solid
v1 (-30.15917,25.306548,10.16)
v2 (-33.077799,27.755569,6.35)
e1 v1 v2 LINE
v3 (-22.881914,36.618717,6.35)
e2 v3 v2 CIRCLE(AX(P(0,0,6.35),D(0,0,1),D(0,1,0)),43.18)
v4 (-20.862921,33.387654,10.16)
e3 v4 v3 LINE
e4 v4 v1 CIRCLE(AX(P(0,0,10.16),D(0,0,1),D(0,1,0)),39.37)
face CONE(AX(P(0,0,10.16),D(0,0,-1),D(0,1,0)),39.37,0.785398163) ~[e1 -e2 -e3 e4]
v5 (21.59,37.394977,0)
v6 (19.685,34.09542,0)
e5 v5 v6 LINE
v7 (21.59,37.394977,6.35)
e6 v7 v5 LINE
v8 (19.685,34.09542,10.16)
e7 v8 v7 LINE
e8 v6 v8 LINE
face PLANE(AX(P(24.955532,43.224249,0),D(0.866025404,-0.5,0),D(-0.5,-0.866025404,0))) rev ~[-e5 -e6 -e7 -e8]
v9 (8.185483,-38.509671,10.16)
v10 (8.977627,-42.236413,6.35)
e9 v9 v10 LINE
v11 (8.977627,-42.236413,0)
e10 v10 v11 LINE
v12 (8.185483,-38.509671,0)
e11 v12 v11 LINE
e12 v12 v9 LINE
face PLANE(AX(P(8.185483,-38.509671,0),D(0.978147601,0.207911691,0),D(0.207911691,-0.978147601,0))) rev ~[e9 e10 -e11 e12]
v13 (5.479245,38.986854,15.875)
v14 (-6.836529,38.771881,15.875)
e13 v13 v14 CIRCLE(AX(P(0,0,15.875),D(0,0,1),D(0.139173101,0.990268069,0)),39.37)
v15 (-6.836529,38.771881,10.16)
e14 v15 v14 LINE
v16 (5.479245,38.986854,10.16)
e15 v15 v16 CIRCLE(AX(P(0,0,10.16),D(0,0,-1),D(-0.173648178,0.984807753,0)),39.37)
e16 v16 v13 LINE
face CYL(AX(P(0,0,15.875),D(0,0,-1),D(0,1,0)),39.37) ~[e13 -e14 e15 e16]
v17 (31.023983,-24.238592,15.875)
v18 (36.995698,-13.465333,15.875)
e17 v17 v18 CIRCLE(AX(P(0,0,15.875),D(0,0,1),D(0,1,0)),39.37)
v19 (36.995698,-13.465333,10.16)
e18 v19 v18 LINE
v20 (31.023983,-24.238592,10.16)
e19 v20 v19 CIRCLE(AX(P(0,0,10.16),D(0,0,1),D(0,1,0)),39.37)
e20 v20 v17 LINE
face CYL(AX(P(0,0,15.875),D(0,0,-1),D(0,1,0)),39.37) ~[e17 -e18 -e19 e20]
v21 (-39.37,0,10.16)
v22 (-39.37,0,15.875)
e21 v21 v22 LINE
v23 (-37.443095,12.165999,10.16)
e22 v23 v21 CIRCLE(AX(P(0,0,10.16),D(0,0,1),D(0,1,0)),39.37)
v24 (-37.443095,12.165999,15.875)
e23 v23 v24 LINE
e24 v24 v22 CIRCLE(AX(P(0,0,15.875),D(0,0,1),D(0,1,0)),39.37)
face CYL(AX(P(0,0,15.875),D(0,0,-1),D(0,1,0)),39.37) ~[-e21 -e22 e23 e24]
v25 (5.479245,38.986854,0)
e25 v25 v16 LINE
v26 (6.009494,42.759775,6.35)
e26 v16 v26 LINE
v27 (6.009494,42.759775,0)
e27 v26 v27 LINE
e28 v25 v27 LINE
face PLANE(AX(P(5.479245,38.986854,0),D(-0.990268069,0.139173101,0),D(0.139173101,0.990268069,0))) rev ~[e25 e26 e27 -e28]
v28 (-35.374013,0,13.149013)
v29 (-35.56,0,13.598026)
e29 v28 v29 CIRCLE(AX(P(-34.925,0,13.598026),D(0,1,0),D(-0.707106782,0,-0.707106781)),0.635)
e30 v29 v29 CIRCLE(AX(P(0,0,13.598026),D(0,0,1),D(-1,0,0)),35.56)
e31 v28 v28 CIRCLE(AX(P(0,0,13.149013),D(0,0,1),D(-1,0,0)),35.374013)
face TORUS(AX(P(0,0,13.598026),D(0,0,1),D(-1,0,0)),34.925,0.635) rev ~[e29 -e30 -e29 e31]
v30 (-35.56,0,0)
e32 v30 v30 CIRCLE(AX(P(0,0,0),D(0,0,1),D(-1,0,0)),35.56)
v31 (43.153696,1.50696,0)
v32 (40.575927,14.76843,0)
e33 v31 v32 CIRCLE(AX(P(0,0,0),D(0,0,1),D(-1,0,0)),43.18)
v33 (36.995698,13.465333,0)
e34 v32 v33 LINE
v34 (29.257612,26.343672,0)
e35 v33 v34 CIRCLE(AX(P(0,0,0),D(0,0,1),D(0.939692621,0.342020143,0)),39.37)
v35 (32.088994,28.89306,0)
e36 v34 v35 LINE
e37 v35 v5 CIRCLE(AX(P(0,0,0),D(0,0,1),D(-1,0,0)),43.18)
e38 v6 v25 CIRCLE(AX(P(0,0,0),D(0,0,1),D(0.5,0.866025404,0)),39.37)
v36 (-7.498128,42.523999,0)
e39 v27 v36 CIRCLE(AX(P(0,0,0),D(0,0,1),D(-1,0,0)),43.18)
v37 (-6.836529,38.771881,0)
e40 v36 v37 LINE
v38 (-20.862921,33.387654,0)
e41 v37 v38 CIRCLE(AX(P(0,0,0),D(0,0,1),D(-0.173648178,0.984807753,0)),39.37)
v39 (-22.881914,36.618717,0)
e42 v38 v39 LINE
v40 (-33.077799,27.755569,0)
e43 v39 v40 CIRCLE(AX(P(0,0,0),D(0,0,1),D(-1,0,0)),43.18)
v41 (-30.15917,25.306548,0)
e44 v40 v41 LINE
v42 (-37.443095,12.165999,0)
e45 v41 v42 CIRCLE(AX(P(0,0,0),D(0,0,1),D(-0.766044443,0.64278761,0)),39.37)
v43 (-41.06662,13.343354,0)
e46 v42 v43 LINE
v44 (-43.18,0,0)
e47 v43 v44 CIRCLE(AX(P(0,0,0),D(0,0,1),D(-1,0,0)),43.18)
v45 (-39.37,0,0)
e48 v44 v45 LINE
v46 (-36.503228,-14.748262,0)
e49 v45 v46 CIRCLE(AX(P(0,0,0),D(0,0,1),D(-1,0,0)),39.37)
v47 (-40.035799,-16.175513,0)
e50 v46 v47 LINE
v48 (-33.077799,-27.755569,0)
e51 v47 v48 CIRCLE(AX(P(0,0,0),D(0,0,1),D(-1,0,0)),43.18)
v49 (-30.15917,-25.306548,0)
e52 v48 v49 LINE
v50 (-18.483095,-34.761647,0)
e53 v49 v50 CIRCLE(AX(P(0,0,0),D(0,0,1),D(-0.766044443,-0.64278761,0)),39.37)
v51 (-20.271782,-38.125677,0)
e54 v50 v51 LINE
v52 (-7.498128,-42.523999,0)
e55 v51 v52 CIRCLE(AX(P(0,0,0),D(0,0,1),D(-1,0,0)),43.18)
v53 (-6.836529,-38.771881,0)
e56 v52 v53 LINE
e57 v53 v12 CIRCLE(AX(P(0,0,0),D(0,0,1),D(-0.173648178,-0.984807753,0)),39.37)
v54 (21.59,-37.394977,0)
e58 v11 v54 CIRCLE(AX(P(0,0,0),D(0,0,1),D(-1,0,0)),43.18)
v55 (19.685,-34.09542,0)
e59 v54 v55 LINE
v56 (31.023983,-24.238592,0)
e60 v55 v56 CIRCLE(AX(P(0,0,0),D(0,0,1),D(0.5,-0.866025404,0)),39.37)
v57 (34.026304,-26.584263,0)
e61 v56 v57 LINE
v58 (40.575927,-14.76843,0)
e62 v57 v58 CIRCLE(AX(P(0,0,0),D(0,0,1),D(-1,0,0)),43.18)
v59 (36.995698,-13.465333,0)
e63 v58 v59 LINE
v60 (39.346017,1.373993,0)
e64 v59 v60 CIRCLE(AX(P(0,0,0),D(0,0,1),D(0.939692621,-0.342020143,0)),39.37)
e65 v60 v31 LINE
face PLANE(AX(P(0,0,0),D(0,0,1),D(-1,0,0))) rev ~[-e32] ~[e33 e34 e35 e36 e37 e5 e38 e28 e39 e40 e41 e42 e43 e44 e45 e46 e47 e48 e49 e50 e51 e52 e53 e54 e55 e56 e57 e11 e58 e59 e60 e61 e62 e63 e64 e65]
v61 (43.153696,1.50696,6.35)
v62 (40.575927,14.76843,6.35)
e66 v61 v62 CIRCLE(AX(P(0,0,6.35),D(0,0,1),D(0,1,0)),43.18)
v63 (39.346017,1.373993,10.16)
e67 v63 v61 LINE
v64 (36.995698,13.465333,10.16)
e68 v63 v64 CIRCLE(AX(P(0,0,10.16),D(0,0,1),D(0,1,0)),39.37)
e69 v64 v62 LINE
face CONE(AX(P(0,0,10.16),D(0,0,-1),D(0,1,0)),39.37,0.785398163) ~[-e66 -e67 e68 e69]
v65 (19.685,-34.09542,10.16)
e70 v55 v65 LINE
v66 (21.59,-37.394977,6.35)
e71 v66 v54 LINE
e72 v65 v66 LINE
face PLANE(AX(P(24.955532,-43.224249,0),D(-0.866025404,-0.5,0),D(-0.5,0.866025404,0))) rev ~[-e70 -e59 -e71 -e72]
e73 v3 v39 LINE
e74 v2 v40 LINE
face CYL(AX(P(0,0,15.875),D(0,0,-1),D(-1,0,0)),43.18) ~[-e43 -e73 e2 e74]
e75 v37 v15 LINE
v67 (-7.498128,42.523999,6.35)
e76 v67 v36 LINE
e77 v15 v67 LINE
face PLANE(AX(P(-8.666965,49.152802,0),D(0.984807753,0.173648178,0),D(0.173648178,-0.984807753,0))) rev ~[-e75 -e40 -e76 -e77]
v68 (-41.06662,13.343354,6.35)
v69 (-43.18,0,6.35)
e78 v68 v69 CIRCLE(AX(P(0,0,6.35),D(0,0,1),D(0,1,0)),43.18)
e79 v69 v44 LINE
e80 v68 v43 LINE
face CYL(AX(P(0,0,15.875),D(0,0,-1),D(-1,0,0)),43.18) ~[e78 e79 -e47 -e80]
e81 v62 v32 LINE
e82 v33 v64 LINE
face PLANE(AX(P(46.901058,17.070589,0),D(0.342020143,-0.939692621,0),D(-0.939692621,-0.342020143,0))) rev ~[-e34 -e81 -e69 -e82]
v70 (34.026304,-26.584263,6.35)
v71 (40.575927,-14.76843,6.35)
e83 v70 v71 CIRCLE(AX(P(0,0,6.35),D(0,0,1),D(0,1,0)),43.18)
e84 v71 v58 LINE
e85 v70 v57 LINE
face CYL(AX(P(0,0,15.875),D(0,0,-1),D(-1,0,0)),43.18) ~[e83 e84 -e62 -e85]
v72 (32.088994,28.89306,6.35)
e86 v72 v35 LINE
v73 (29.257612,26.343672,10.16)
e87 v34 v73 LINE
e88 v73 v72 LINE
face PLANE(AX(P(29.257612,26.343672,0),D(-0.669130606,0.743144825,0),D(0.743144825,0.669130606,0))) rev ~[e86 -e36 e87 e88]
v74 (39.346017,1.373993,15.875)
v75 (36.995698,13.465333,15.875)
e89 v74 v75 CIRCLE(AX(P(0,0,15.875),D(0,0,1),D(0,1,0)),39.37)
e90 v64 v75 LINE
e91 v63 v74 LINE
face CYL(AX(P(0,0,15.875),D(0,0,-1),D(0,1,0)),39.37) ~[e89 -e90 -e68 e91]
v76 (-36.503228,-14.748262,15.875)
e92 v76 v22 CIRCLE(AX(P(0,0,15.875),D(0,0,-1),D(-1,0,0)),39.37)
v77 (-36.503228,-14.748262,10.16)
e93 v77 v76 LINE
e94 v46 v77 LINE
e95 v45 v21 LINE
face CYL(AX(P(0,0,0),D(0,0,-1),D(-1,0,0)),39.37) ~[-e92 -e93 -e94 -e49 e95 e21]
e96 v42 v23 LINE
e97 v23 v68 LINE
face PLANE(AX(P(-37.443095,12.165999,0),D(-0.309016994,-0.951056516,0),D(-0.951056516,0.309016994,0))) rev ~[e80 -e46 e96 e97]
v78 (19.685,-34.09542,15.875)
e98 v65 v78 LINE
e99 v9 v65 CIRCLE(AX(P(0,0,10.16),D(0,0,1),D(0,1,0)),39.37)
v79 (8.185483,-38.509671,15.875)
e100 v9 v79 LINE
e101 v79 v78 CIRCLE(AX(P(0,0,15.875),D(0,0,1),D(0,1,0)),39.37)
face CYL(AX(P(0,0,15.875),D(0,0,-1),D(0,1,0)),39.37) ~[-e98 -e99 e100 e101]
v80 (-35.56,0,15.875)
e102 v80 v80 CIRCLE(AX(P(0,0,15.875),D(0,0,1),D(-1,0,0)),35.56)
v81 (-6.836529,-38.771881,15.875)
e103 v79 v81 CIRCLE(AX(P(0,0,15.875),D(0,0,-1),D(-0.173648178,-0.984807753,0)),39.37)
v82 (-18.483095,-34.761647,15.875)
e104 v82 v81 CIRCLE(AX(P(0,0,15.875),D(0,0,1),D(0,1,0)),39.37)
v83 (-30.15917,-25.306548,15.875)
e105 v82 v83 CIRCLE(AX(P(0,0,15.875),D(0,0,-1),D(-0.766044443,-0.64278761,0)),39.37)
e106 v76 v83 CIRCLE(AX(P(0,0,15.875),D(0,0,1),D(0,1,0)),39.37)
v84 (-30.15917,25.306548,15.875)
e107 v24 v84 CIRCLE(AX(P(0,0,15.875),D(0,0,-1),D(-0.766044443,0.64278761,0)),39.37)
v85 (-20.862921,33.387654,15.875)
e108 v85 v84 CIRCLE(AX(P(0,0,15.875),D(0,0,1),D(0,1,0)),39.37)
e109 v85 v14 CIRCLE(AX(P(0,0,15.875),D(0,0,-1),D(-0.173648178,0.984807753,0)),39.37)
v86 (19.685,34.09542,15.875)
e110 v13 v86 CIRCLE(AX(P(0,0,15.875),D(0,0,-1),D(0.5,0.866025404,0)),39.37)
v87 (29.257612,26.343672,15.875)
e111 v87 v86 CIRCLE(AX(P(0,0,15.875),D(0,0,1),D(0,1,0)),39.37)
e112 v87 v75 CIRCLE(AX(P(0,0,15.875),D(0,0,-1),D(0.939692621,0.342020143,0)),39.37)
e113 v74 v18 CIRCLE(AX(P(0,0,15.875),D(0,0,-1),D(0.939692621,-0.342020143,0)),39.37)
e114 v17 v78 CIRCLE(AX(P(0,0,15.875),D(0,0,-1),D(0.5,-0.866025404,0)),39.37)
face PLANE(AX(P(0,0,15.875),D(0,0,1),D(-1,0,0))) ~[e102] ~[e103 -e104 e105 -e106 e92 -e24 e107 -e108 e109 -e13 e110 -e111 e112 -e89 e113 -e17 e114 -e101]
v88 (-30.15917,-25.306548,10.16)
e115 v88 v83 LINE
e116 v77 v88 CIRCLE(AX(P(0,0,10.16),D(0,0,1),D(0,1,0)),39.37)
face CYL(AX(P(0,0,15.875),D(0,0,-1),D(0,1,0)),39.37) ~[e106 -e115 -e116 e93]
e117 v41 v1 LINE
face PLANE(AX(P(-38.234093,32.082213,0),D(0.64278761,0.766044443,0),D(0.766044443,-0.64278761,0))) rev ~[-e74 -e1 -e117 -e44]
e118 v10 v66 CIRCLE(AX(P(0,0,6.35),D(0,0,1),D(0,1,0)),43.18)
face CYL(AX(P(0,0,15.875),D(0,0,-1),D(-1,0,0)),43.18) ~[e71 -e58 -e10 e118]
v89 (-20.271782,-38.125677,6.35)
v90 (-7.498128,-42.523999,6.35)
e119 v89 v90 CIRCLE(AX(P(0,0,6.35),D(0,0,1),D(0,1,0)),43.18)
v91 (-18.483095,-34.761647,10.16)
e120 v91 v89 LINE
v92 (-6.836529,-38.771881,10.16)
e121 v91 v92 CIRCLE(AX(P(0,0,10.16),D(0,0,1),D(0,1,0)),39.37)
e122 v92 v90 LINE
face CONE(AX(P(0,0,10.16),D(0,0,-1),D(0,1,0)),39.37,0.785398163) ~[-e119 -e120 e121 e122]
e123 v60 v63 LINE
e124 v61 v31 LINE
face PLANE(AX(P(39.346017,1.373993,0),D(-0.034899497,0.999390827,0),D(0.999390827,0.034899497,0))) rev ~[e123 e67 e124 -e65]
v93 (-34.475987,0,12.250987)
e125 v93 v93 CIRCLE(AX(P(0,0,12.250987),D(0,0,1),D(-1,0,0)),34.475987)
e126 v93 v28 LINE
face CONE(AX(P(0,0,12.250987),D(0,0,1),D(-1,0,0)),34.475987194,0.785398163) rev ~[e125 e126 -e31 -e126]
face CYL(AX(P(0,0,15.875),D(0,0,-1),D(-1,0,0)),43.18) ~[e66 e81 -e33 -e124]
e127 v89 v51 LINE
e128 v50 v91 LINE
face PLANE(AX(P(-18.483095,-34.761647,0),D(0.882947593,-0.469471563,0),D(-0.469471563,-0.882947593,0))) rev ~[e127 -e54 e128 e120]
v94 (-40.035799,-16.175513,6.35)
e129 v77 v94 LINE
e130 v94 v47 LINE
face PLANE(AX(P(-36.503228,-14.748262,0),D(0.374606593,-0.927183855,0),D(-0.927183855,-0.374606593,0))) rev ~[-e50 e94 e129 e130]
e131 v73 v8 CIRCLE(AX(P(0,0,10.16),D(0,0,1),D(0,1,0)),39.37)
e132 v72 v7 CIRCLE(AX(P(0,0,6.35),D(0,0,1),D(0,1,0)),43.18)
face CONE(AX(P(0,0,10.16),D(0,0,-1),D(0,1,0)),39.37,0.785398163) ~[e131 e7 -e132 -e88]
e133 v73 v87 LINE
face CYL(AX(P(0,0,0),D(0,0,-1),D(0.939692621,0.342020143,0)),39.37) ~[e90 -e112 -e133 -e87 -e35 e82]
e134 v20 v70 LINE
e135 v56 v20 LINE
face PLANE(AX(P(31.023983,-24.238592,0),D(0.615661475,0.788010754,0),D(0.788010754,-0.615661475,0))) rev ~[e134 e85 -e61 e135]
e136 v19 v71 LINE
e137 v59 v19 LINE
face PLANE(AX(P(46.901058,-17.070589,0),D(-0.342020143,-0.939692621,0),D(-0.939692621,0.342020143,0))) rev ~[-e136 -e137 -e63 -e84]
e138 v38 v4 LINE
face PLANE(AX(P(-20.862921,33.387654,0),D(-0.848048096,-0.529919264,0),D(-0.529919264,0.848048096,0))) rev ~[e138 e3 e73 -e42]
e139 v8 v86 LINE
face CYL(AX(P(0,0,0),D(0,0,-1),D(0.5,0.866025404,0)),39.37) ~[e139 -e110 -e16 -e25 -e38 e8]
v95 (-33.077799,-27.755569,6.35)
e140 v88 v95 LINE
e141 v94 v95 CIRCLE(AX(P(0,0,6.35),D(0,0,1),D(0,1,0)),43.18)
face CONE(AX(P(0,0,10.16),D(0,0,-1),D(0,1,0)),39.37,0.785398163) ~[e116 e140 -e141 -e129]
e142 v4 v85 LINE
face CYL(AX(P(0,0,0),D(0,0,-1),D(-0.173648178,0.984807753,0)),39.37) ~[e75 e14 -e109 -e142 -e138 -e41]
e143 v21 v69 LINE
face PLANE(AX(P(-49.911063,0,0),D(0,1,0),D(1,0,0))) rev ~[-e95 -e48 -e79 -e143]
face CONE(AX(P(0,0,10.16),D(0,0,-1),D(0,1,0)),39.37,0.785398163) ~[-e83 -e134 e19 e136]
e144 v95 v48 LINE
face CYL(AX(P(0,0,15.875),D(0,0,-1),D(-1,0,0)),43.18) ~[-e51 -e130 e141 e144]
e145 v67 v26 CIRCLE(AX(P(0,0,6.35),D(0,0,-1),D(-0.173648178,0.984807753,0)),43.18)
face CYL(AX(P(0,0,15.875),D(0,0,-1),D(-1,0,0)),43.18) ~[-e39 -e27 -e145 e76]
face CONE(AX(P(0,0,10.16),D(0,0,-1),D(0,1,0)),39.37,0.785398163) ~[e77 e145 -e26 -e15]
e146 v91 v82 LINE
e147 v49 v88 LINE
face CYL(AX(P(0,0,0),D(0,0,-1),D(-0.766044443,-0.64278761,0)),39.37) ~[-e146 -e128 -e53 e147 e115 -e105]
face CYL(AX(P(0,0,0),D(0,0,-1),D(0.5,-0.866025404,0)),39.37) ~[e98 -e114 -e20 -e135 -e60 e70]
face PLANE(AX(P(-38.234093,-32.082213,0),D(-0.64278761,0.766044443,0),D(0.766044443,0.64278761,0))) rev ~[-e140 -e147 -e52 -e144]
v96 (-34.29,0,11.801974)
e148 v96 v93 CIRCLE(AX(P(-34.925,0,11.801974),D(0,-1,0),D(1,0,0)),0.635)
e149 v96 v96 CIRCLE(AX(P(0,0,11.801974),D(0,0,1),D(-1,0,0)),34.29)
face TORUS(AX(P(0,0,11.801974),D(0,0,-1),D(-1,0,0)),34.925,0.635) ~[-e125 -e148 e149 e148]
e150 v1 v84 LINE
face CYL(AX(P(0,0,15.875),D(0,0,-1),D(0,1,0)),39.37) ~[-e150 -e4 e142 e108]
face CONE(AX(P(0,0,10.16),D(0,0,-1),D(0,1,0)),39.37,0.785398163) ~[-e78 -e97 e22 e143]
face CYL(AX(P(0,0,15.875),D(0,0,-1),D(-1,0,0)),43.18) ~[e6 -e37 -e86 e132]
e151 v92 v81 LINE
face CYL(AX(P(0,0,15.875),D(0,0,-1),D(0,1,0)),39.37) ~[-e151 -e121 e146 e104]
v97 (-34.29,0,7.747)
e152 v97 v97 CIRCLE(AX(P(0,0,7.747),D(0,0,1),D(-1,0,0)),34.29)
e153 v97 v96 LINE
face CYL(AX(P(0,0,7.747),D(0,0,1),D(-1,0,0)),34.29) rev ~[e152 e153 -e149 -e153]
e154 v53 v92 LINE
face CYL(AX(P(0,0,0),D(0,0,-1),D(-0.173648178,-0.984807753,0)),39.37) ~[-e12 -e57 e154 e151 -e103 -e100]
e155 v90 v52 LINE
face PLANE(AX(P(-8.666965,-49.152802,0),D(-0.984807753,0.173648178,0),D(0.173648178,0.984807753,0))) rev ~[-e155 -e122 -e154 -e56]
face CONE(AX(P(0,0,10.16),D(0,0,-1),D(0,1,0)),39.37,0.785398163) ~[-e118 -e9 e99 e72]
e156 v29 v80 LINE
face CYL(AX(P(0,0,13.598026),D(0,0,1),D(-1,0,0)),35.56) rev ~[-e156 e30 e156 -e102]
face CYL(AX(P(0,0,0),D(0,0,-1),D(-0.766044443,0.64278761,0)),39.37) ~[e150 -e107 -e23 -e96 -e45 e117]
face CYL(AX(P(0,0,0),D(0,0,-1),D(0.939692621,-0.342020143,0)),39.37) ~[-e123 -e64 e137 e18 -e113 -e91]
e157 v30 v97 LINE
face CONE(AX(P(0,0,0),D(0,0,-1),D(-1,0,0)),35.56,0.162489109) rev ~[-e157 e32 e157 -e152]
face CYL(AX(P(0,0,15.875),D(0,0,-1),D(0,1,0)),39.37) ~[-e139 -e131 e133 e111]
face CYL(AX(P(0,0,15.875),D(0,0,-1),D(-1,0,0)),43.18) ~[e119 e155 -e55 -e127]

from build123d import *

# Parameters (mm, degrees)
F3_DEPTH        = 25.4
F3_COPIES_COUNT = 9


# Not quite as in the source:
# - a pattern or mirror of a feature is missing from the dataset's text; its kind, count and spacing are read off the source's solid


with BuildPart() as f1:
    # F0 (on Front) → F1 (revolve)
    with BuildSketch(Plane.XZ):
        with BuildLine():
            Line((-43.18, 15.875), (-43.18, 0))
            Line((-43.18, 0), (-35.56, 0))
            Line((-35.56, 0), (-34.29, 7.747))
            Line((-34.29, 7.747), (-34.29, 11.8019743879))
            ThreePointArc((-34.29, 11.8019743879), (-34.3383364969, 12.0449783674), (-34.4759871939, 12.2509871939))
            Line((-34.4759871939, 12.2509871939), (-35.3740128061, 13.1490128061))
            ThreePointArc((-35.3740128061, 13.1490128061), (-35.5116635031, 13.3550216326), (-35.56, 13.5980256121))
            Line((-35.56, 13.5980256121), (-35.56, 15.875))
            Line((-35.56, 15.875), (-43.18, 15.875))
        make_face()
    revolve(axis=Axis((0, 0, 20.137766609), (0, 0, 1)))

    # F2 (on face) → F3 (cut)
    with BuildSketch(Plane(origin=(0, 0, 0), x_dir=(1, 0, 0), z_dir=(0, 0, -1))):
        with BuildLine():
            Line((-49.9110633764, 0), (-39.37, 0))
            ThreePointArc((-39.37, 0), (-38.6466622123, 7.512150148), (-36.5032283543, 14.7482615828))
            Line((-36.5032283543, 14.7482615828), (-46.2767321268, 18.6970134252))
            ThreePointArc((-46.2767321268, 18.6970134252), (-48.994056565, 9.523479861), (-49.9110633764, 0))
        make_face()
    f3 = extrude(amount=-F3_DEPTH, mode=Mode.SUBTRACT)

    # F3_copies: F3 ×9 about axis
    f3_copies_axis = Axis((0, 0, 0), (0, 0, 1))
    for i in range(1, F3_COPIES_COUNT):
        add(f3.rotate(f3_copies_axis, i * 360 / F3_COPIES_COUNT), mode=Mode.SUBTRACT)

    # F5 (on Right) → F6 (revolve, cut)
    with BuildSketch(Plane.YZ):
        Polygon((39.37, 15.875), (39.37, 10.16), (43.18, 6.35), (43.18, 15.875), align=None)
    revolve(axis=Axis((0, 0, 20.137766609), (0, 0, 1)), mode=Mode.SUBTRACT)


solid = f1.part
